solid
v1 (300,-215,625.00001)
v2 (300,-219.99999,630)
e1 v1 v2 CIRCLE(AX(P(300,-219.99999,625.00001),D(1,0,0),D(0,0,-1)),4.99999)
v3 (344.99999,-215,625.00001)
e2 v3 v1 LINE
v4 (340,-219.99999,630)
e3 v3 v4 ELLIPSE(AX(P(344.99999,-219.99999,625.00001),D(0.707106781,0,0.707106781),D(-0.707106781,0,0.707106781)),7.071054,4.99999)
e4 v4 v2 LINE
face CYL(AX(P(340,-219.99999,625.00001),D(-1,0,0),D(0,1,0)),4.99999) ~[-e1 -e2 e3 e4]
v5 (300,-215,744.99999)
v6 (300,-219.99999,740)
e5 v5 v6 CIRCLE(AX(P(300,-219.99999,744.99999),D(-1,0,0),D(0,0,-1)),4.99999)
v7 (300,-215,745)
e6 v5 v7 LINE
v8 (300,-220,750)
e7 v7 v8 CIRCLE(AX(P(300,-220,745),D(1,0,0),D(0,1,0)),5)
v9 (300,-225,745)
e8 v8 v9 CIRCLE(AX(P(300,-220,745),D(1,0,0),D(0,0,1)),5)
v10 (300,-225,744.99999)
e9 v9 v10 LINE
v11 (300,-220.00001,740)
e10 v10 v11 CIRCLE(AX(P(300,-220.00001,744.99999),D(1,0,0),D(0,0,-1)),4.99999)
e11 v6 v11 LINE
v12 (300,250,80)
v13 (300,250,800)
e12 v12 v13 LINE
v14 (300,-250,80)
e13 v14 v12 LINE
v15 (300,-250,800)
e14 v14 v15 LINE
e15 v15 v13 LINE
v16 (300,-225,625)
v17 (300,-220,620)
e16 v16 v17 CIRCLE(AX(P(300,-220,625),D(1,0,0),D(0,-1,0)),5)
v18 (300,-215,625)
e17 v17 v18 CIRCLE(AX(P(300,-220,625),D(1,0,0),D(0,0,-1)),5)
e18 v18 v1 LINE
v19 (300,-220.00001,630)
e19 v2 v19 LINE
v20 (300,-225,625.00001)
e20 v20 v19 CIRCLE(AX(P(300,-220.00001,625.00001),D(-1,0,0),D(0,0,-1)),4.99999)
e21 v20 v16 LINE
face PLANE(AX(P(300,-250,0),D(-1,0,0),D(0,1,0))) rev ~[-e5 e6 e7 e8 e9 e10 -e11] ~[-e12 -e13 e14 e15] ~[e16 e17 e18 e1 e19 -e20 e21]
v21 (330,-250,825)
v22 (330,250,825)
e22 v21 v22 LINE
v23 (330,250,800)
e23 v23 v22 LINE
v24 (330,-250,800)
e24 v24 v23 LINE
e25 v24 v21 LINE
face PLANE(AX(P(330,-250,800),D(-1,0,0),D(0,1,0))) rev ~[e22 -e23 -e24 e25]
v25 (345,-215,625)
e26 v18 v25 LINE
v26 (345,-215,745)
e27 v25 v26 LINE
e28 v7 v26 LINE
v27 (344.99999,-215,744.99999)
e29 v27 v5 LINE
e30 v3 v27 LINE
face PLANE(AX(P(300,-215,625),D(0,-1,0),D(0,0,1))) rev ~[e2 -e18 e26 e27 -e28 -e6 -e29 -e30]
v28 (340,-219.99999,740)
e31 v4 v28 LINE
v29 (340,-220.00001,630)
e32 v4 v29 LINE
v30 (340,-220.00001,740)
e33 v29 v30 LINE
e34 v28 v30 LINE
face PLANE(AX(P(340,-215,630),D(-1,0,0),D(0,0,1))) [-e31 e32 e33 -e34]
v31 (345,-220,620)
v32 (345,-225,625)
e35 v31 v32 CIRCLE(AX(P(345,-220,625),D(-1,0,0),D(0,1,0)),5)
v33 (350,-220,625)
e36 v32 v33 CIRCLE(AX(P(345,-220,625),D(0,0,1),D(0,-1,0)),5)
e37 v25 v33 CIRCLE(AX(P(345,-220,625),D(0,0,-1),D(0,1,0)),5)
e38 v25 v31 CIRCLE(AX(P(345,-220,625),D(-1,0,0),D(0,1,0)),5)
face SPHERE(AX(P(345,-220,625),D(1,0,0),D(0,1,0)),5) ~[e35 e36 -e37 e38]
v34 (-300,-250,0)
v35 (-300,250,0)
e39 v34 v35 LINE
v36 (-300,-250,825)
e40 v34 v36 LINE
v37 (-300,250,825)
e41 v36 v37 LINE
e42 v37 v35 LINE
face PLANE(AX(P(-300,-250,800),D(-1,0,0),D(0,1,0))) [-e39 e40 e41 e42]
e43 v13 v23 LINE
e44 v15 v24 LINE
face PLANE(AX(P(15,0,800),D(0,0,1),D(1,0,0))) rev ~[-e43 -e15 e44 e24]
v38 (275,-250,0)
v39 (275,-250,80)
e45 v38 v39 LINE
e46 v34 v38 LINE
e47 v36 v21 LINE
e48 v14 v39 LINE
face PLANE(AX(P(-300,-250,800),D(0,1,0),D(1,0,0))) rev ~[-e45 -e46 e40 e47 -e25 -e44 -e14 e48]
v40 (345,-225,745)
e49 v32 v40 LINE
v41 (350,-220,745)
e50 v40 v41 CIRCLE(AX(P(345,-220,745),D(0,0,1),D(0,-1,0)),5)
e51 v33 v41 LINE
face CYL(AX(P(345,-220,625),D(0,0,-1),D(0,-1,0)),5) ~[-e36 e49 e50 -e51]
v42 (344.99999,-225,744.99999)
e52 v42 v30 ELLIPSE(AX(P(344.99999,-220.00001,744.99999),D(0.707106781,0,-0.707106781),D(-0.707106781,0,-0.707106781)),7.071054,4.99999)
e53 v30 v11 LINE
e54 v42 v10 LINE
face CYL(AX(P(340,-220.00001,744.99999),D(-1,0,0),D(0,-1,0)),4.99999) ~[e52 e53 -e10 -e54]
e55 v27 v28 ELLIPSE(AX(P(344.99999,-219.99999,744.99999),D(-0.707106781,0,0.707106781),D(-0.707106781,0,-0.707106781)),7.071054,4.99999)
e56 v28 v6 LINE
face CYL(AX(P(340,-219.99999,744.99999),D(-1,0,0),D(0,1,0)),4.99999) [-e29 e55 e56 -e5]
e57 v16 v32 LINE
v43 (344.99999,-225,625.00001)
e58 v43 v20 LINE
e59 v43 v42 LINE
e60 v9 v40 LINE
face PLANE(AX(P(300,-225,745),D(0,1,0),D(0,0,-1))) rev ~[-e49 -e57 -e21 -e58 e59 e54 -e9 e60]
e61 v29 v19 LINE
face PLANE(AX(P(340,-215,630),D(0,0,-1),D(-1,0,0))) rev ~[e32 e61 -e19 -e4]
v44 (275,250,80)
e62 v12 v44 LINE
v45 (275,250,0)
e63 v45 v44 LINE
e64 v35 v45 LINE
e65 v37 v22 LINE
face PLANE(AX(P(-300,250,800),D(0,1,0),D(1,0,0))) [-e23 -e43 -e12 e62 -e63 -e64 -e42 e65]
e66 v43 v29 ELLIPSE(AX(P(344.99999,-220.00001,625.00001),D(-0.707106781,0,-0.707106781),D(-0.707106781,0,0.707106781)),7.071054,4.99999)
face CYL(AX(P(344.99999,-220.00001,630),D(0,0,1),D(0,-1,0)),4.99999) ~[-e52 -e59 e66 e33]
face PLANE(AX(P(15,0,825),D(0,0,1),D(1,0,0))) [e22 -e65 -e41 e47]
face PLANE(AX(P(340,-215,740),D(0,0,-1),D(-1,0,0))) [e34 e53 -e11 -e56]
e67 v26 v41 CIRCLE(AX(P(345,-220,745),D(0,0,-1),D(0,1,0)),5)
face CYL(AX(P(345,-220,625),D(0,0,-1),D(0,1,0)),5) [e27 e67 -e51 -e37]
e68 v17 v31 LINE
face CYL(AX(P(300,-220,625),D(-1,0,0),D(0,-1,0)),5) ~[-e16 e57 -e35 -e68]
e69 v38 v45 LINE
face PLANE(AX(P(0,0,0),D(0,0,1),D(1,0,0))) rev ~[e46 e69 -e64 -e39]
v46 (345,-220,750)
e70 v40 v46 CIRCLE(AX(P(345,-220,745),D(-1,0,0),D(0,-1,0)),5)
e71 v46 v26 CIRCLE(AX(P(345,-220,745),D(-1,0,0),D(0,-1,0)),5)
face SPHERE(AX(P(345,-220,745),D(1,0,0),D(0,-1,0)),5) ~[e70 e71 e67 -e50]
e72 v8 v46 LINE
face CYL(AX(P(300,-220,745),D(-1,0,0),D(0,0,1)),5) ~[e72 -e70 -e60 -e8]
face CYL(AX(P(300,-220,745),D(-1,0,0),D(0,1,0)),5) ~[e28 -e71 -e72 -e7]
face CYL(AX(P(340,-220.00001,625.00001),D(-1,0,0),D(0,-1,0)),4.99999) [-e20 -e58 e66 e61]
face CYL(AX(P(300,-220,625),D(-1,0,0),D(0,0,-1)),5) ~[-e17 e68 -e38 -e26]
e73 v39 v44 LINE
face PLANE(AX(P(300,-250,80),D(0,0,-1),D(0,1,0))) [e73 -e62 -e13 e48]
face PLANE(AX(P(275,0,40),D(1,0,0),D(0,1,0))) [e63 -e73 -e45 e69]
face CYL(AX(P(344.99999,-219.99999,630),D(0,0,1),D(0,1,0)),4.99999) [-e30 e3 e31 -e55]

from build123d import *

# Parameters (mm, degrees)
F0_W        = 600
F0_H        = 500
F1_DEPTH    = 800
F2_W        = 500
F2_H        = 80
F3_DEPTH    = 25
F5_DEPTH    = 50
F6_T1_DEPTH = 120
F6_T4_ANGLE = 180
F6_T6_ANGLE = 180
F7_W        = 40
F7_H        = 110
F8_DEPTH    = 25
F9_R        = 4.99999
F10_W       = 630
F10_H       = 500
F11_DEPTH   = 25


# Not quite as in the source:
# - a fillet or chamfer that OpenCascade refuses, or shapes differently, is made with other operations: its cross-section is extruded or revolved along the edge and cut away or added
# - a fillet or chamfer is up to 0.001 mm smaller than in the source, because OpenCascade refuses the exact size


with BuildPart() as f1:
    # F0 (on Top) → F1 (new body)
    with BuildSketch(Plane.XY):
        Rectangle(F0_W, F0_H)
    extrude(amount=F1_DEPTH)

    # F2 (on face) → F3 (cut)
    with BuildSketch(Plane.YZ.offset(300)):
        with Locations((0, 40)):
            Rectangle(F2_W, F2_H)
    extrude(amount=-F3_DEPTH, mode=Mode.SUBTRACT)

    # F4 (on face) → F5 (join)
    with BuildSketch(Plane.YZ.offset(300)):
        with BuildLine():
            ThreePointArc((-220, 750), (-223.5355339059, 748.5355339059), (-225, 745))
            Line((-225, 745), (-225, 625))
            ThreePointArc((-225, 625), (-223.5355339059, 621.4644660941), (-220, 620))
            ThreePointArc((-220, 620), (-216.4644660941, 621.4644660941), (-215, 625))
            Line((-215, 625), (-215, 745))
            ThreePointArc((-215, 745), (-216.4644660941, 748.5355339059), (-220, 750))
        make_face()
    extrude(amount=F5_DEPTH)

    # F6: fillet of radius 5 on 4 edges, made by hand

    # F6_s2 → F6_t1 (cut)
    with BuildSketch(Plane.XY.offset(625)):
        with BuildLine():
            ThreePointArc((345, -225), (348.5355339059, -223.5355339059), (350, -220))
            Line((350, -220), (350.1, -220))
            Line((350.1, -220), (350.1, -225.1))
            Line((350.1, -225.1), (345, -225.1))
            Line((345, -225.1), (345, -225))
        make_face()
        with BuildLine():
            ThreePointArc((345, -215), (348.5355339059, -216.4644660941), (350, -220))
            Line((350, -220), (350.1, -220))
            Line((350.1, -220), (350.1, -214.9))
            Line((350.1, -214.9), (345, -214.9))
            Line((345, -214.9), (345, -215))
        make_face()
    extrude(amount=F6_T1_DEPTH, mode=Mode.SUBTRACT)

    # F6_s3 → F6_t4 (revolve, cut)
    with BuildSketch(Plane.XY.offset(745)):
        with BuildLine():
            ThreePointArc((345, -225), (348.5355339059, -223.5355339059), (350, -220))
            Line((350, -220), (350.1, -220))
            Line((350.1, -220), (350.1, -225.1))
            Line((350.1, -225.1), (345, -225.1))
            Line((345, -225.1), (345, -225))
        make_face()
    revolve(axis=Axis((350, -220, 745), (-1, 0, 0)), revolution_arc=F6_T4_ANGLE, mode=Mode.SUBTRACT)

    # F6_s5 → F6_t6 (revolve, cut)
    with BuildSketch(Plane.XY.offset(625)):
        with BuildLine():
            ThreePointArc((345, -215), (348.5355339059, -216.4644660941), (350, -220))
            Line((350, -220), (350.1, -220))
            Line((350.1, -220), (350.1, -214.9))
            Line((350.1, -214.9), (345, -214.9))
            Line((345, -214.9), (345, -215))
        make_face()
    revolve(axis=Axis((350, -220, 625), (-1, 0, 0)), revolution_arc=F6_T6_ANGLE, mode=Mode.SUBTRACT)

    # F7 (on face) → F8 (cut)
    with BuildSketch(Plane(origin=(0, -215, 0), x_dir=(-1, 0, 0), z_dir=(0, 1, 0))):
        with Locations((-320, 685)):
            Rectangle(F7_W, F7_H)
    extrude(amount=-F8_DEPTH, mode=Mode.SUBTRACT)

    # F9 (radius 5 in the source; OpenCascade refuses exactly that, so slightly less here)
    f9_edges = [f1.edges().sort_by_distance(p)[0] for p in [
        (320, -215, 740),
        (340, -215, 685),
        (320, -215, 630),
        (320, -225, 740),
        (340, -225, 685),
        (320, -225, 630),
    ]]
    fillet(f9_edges, radius=F9_R)

    # F10 (on face) → F11 (join)
    with BuildSketch(Plane.XY.offset(800)):
        with Locations((15, 0)):
            Rectangle(F10_W, F10_H)
    extrude(amount=F11_DEPTH)


solid = f1.part
